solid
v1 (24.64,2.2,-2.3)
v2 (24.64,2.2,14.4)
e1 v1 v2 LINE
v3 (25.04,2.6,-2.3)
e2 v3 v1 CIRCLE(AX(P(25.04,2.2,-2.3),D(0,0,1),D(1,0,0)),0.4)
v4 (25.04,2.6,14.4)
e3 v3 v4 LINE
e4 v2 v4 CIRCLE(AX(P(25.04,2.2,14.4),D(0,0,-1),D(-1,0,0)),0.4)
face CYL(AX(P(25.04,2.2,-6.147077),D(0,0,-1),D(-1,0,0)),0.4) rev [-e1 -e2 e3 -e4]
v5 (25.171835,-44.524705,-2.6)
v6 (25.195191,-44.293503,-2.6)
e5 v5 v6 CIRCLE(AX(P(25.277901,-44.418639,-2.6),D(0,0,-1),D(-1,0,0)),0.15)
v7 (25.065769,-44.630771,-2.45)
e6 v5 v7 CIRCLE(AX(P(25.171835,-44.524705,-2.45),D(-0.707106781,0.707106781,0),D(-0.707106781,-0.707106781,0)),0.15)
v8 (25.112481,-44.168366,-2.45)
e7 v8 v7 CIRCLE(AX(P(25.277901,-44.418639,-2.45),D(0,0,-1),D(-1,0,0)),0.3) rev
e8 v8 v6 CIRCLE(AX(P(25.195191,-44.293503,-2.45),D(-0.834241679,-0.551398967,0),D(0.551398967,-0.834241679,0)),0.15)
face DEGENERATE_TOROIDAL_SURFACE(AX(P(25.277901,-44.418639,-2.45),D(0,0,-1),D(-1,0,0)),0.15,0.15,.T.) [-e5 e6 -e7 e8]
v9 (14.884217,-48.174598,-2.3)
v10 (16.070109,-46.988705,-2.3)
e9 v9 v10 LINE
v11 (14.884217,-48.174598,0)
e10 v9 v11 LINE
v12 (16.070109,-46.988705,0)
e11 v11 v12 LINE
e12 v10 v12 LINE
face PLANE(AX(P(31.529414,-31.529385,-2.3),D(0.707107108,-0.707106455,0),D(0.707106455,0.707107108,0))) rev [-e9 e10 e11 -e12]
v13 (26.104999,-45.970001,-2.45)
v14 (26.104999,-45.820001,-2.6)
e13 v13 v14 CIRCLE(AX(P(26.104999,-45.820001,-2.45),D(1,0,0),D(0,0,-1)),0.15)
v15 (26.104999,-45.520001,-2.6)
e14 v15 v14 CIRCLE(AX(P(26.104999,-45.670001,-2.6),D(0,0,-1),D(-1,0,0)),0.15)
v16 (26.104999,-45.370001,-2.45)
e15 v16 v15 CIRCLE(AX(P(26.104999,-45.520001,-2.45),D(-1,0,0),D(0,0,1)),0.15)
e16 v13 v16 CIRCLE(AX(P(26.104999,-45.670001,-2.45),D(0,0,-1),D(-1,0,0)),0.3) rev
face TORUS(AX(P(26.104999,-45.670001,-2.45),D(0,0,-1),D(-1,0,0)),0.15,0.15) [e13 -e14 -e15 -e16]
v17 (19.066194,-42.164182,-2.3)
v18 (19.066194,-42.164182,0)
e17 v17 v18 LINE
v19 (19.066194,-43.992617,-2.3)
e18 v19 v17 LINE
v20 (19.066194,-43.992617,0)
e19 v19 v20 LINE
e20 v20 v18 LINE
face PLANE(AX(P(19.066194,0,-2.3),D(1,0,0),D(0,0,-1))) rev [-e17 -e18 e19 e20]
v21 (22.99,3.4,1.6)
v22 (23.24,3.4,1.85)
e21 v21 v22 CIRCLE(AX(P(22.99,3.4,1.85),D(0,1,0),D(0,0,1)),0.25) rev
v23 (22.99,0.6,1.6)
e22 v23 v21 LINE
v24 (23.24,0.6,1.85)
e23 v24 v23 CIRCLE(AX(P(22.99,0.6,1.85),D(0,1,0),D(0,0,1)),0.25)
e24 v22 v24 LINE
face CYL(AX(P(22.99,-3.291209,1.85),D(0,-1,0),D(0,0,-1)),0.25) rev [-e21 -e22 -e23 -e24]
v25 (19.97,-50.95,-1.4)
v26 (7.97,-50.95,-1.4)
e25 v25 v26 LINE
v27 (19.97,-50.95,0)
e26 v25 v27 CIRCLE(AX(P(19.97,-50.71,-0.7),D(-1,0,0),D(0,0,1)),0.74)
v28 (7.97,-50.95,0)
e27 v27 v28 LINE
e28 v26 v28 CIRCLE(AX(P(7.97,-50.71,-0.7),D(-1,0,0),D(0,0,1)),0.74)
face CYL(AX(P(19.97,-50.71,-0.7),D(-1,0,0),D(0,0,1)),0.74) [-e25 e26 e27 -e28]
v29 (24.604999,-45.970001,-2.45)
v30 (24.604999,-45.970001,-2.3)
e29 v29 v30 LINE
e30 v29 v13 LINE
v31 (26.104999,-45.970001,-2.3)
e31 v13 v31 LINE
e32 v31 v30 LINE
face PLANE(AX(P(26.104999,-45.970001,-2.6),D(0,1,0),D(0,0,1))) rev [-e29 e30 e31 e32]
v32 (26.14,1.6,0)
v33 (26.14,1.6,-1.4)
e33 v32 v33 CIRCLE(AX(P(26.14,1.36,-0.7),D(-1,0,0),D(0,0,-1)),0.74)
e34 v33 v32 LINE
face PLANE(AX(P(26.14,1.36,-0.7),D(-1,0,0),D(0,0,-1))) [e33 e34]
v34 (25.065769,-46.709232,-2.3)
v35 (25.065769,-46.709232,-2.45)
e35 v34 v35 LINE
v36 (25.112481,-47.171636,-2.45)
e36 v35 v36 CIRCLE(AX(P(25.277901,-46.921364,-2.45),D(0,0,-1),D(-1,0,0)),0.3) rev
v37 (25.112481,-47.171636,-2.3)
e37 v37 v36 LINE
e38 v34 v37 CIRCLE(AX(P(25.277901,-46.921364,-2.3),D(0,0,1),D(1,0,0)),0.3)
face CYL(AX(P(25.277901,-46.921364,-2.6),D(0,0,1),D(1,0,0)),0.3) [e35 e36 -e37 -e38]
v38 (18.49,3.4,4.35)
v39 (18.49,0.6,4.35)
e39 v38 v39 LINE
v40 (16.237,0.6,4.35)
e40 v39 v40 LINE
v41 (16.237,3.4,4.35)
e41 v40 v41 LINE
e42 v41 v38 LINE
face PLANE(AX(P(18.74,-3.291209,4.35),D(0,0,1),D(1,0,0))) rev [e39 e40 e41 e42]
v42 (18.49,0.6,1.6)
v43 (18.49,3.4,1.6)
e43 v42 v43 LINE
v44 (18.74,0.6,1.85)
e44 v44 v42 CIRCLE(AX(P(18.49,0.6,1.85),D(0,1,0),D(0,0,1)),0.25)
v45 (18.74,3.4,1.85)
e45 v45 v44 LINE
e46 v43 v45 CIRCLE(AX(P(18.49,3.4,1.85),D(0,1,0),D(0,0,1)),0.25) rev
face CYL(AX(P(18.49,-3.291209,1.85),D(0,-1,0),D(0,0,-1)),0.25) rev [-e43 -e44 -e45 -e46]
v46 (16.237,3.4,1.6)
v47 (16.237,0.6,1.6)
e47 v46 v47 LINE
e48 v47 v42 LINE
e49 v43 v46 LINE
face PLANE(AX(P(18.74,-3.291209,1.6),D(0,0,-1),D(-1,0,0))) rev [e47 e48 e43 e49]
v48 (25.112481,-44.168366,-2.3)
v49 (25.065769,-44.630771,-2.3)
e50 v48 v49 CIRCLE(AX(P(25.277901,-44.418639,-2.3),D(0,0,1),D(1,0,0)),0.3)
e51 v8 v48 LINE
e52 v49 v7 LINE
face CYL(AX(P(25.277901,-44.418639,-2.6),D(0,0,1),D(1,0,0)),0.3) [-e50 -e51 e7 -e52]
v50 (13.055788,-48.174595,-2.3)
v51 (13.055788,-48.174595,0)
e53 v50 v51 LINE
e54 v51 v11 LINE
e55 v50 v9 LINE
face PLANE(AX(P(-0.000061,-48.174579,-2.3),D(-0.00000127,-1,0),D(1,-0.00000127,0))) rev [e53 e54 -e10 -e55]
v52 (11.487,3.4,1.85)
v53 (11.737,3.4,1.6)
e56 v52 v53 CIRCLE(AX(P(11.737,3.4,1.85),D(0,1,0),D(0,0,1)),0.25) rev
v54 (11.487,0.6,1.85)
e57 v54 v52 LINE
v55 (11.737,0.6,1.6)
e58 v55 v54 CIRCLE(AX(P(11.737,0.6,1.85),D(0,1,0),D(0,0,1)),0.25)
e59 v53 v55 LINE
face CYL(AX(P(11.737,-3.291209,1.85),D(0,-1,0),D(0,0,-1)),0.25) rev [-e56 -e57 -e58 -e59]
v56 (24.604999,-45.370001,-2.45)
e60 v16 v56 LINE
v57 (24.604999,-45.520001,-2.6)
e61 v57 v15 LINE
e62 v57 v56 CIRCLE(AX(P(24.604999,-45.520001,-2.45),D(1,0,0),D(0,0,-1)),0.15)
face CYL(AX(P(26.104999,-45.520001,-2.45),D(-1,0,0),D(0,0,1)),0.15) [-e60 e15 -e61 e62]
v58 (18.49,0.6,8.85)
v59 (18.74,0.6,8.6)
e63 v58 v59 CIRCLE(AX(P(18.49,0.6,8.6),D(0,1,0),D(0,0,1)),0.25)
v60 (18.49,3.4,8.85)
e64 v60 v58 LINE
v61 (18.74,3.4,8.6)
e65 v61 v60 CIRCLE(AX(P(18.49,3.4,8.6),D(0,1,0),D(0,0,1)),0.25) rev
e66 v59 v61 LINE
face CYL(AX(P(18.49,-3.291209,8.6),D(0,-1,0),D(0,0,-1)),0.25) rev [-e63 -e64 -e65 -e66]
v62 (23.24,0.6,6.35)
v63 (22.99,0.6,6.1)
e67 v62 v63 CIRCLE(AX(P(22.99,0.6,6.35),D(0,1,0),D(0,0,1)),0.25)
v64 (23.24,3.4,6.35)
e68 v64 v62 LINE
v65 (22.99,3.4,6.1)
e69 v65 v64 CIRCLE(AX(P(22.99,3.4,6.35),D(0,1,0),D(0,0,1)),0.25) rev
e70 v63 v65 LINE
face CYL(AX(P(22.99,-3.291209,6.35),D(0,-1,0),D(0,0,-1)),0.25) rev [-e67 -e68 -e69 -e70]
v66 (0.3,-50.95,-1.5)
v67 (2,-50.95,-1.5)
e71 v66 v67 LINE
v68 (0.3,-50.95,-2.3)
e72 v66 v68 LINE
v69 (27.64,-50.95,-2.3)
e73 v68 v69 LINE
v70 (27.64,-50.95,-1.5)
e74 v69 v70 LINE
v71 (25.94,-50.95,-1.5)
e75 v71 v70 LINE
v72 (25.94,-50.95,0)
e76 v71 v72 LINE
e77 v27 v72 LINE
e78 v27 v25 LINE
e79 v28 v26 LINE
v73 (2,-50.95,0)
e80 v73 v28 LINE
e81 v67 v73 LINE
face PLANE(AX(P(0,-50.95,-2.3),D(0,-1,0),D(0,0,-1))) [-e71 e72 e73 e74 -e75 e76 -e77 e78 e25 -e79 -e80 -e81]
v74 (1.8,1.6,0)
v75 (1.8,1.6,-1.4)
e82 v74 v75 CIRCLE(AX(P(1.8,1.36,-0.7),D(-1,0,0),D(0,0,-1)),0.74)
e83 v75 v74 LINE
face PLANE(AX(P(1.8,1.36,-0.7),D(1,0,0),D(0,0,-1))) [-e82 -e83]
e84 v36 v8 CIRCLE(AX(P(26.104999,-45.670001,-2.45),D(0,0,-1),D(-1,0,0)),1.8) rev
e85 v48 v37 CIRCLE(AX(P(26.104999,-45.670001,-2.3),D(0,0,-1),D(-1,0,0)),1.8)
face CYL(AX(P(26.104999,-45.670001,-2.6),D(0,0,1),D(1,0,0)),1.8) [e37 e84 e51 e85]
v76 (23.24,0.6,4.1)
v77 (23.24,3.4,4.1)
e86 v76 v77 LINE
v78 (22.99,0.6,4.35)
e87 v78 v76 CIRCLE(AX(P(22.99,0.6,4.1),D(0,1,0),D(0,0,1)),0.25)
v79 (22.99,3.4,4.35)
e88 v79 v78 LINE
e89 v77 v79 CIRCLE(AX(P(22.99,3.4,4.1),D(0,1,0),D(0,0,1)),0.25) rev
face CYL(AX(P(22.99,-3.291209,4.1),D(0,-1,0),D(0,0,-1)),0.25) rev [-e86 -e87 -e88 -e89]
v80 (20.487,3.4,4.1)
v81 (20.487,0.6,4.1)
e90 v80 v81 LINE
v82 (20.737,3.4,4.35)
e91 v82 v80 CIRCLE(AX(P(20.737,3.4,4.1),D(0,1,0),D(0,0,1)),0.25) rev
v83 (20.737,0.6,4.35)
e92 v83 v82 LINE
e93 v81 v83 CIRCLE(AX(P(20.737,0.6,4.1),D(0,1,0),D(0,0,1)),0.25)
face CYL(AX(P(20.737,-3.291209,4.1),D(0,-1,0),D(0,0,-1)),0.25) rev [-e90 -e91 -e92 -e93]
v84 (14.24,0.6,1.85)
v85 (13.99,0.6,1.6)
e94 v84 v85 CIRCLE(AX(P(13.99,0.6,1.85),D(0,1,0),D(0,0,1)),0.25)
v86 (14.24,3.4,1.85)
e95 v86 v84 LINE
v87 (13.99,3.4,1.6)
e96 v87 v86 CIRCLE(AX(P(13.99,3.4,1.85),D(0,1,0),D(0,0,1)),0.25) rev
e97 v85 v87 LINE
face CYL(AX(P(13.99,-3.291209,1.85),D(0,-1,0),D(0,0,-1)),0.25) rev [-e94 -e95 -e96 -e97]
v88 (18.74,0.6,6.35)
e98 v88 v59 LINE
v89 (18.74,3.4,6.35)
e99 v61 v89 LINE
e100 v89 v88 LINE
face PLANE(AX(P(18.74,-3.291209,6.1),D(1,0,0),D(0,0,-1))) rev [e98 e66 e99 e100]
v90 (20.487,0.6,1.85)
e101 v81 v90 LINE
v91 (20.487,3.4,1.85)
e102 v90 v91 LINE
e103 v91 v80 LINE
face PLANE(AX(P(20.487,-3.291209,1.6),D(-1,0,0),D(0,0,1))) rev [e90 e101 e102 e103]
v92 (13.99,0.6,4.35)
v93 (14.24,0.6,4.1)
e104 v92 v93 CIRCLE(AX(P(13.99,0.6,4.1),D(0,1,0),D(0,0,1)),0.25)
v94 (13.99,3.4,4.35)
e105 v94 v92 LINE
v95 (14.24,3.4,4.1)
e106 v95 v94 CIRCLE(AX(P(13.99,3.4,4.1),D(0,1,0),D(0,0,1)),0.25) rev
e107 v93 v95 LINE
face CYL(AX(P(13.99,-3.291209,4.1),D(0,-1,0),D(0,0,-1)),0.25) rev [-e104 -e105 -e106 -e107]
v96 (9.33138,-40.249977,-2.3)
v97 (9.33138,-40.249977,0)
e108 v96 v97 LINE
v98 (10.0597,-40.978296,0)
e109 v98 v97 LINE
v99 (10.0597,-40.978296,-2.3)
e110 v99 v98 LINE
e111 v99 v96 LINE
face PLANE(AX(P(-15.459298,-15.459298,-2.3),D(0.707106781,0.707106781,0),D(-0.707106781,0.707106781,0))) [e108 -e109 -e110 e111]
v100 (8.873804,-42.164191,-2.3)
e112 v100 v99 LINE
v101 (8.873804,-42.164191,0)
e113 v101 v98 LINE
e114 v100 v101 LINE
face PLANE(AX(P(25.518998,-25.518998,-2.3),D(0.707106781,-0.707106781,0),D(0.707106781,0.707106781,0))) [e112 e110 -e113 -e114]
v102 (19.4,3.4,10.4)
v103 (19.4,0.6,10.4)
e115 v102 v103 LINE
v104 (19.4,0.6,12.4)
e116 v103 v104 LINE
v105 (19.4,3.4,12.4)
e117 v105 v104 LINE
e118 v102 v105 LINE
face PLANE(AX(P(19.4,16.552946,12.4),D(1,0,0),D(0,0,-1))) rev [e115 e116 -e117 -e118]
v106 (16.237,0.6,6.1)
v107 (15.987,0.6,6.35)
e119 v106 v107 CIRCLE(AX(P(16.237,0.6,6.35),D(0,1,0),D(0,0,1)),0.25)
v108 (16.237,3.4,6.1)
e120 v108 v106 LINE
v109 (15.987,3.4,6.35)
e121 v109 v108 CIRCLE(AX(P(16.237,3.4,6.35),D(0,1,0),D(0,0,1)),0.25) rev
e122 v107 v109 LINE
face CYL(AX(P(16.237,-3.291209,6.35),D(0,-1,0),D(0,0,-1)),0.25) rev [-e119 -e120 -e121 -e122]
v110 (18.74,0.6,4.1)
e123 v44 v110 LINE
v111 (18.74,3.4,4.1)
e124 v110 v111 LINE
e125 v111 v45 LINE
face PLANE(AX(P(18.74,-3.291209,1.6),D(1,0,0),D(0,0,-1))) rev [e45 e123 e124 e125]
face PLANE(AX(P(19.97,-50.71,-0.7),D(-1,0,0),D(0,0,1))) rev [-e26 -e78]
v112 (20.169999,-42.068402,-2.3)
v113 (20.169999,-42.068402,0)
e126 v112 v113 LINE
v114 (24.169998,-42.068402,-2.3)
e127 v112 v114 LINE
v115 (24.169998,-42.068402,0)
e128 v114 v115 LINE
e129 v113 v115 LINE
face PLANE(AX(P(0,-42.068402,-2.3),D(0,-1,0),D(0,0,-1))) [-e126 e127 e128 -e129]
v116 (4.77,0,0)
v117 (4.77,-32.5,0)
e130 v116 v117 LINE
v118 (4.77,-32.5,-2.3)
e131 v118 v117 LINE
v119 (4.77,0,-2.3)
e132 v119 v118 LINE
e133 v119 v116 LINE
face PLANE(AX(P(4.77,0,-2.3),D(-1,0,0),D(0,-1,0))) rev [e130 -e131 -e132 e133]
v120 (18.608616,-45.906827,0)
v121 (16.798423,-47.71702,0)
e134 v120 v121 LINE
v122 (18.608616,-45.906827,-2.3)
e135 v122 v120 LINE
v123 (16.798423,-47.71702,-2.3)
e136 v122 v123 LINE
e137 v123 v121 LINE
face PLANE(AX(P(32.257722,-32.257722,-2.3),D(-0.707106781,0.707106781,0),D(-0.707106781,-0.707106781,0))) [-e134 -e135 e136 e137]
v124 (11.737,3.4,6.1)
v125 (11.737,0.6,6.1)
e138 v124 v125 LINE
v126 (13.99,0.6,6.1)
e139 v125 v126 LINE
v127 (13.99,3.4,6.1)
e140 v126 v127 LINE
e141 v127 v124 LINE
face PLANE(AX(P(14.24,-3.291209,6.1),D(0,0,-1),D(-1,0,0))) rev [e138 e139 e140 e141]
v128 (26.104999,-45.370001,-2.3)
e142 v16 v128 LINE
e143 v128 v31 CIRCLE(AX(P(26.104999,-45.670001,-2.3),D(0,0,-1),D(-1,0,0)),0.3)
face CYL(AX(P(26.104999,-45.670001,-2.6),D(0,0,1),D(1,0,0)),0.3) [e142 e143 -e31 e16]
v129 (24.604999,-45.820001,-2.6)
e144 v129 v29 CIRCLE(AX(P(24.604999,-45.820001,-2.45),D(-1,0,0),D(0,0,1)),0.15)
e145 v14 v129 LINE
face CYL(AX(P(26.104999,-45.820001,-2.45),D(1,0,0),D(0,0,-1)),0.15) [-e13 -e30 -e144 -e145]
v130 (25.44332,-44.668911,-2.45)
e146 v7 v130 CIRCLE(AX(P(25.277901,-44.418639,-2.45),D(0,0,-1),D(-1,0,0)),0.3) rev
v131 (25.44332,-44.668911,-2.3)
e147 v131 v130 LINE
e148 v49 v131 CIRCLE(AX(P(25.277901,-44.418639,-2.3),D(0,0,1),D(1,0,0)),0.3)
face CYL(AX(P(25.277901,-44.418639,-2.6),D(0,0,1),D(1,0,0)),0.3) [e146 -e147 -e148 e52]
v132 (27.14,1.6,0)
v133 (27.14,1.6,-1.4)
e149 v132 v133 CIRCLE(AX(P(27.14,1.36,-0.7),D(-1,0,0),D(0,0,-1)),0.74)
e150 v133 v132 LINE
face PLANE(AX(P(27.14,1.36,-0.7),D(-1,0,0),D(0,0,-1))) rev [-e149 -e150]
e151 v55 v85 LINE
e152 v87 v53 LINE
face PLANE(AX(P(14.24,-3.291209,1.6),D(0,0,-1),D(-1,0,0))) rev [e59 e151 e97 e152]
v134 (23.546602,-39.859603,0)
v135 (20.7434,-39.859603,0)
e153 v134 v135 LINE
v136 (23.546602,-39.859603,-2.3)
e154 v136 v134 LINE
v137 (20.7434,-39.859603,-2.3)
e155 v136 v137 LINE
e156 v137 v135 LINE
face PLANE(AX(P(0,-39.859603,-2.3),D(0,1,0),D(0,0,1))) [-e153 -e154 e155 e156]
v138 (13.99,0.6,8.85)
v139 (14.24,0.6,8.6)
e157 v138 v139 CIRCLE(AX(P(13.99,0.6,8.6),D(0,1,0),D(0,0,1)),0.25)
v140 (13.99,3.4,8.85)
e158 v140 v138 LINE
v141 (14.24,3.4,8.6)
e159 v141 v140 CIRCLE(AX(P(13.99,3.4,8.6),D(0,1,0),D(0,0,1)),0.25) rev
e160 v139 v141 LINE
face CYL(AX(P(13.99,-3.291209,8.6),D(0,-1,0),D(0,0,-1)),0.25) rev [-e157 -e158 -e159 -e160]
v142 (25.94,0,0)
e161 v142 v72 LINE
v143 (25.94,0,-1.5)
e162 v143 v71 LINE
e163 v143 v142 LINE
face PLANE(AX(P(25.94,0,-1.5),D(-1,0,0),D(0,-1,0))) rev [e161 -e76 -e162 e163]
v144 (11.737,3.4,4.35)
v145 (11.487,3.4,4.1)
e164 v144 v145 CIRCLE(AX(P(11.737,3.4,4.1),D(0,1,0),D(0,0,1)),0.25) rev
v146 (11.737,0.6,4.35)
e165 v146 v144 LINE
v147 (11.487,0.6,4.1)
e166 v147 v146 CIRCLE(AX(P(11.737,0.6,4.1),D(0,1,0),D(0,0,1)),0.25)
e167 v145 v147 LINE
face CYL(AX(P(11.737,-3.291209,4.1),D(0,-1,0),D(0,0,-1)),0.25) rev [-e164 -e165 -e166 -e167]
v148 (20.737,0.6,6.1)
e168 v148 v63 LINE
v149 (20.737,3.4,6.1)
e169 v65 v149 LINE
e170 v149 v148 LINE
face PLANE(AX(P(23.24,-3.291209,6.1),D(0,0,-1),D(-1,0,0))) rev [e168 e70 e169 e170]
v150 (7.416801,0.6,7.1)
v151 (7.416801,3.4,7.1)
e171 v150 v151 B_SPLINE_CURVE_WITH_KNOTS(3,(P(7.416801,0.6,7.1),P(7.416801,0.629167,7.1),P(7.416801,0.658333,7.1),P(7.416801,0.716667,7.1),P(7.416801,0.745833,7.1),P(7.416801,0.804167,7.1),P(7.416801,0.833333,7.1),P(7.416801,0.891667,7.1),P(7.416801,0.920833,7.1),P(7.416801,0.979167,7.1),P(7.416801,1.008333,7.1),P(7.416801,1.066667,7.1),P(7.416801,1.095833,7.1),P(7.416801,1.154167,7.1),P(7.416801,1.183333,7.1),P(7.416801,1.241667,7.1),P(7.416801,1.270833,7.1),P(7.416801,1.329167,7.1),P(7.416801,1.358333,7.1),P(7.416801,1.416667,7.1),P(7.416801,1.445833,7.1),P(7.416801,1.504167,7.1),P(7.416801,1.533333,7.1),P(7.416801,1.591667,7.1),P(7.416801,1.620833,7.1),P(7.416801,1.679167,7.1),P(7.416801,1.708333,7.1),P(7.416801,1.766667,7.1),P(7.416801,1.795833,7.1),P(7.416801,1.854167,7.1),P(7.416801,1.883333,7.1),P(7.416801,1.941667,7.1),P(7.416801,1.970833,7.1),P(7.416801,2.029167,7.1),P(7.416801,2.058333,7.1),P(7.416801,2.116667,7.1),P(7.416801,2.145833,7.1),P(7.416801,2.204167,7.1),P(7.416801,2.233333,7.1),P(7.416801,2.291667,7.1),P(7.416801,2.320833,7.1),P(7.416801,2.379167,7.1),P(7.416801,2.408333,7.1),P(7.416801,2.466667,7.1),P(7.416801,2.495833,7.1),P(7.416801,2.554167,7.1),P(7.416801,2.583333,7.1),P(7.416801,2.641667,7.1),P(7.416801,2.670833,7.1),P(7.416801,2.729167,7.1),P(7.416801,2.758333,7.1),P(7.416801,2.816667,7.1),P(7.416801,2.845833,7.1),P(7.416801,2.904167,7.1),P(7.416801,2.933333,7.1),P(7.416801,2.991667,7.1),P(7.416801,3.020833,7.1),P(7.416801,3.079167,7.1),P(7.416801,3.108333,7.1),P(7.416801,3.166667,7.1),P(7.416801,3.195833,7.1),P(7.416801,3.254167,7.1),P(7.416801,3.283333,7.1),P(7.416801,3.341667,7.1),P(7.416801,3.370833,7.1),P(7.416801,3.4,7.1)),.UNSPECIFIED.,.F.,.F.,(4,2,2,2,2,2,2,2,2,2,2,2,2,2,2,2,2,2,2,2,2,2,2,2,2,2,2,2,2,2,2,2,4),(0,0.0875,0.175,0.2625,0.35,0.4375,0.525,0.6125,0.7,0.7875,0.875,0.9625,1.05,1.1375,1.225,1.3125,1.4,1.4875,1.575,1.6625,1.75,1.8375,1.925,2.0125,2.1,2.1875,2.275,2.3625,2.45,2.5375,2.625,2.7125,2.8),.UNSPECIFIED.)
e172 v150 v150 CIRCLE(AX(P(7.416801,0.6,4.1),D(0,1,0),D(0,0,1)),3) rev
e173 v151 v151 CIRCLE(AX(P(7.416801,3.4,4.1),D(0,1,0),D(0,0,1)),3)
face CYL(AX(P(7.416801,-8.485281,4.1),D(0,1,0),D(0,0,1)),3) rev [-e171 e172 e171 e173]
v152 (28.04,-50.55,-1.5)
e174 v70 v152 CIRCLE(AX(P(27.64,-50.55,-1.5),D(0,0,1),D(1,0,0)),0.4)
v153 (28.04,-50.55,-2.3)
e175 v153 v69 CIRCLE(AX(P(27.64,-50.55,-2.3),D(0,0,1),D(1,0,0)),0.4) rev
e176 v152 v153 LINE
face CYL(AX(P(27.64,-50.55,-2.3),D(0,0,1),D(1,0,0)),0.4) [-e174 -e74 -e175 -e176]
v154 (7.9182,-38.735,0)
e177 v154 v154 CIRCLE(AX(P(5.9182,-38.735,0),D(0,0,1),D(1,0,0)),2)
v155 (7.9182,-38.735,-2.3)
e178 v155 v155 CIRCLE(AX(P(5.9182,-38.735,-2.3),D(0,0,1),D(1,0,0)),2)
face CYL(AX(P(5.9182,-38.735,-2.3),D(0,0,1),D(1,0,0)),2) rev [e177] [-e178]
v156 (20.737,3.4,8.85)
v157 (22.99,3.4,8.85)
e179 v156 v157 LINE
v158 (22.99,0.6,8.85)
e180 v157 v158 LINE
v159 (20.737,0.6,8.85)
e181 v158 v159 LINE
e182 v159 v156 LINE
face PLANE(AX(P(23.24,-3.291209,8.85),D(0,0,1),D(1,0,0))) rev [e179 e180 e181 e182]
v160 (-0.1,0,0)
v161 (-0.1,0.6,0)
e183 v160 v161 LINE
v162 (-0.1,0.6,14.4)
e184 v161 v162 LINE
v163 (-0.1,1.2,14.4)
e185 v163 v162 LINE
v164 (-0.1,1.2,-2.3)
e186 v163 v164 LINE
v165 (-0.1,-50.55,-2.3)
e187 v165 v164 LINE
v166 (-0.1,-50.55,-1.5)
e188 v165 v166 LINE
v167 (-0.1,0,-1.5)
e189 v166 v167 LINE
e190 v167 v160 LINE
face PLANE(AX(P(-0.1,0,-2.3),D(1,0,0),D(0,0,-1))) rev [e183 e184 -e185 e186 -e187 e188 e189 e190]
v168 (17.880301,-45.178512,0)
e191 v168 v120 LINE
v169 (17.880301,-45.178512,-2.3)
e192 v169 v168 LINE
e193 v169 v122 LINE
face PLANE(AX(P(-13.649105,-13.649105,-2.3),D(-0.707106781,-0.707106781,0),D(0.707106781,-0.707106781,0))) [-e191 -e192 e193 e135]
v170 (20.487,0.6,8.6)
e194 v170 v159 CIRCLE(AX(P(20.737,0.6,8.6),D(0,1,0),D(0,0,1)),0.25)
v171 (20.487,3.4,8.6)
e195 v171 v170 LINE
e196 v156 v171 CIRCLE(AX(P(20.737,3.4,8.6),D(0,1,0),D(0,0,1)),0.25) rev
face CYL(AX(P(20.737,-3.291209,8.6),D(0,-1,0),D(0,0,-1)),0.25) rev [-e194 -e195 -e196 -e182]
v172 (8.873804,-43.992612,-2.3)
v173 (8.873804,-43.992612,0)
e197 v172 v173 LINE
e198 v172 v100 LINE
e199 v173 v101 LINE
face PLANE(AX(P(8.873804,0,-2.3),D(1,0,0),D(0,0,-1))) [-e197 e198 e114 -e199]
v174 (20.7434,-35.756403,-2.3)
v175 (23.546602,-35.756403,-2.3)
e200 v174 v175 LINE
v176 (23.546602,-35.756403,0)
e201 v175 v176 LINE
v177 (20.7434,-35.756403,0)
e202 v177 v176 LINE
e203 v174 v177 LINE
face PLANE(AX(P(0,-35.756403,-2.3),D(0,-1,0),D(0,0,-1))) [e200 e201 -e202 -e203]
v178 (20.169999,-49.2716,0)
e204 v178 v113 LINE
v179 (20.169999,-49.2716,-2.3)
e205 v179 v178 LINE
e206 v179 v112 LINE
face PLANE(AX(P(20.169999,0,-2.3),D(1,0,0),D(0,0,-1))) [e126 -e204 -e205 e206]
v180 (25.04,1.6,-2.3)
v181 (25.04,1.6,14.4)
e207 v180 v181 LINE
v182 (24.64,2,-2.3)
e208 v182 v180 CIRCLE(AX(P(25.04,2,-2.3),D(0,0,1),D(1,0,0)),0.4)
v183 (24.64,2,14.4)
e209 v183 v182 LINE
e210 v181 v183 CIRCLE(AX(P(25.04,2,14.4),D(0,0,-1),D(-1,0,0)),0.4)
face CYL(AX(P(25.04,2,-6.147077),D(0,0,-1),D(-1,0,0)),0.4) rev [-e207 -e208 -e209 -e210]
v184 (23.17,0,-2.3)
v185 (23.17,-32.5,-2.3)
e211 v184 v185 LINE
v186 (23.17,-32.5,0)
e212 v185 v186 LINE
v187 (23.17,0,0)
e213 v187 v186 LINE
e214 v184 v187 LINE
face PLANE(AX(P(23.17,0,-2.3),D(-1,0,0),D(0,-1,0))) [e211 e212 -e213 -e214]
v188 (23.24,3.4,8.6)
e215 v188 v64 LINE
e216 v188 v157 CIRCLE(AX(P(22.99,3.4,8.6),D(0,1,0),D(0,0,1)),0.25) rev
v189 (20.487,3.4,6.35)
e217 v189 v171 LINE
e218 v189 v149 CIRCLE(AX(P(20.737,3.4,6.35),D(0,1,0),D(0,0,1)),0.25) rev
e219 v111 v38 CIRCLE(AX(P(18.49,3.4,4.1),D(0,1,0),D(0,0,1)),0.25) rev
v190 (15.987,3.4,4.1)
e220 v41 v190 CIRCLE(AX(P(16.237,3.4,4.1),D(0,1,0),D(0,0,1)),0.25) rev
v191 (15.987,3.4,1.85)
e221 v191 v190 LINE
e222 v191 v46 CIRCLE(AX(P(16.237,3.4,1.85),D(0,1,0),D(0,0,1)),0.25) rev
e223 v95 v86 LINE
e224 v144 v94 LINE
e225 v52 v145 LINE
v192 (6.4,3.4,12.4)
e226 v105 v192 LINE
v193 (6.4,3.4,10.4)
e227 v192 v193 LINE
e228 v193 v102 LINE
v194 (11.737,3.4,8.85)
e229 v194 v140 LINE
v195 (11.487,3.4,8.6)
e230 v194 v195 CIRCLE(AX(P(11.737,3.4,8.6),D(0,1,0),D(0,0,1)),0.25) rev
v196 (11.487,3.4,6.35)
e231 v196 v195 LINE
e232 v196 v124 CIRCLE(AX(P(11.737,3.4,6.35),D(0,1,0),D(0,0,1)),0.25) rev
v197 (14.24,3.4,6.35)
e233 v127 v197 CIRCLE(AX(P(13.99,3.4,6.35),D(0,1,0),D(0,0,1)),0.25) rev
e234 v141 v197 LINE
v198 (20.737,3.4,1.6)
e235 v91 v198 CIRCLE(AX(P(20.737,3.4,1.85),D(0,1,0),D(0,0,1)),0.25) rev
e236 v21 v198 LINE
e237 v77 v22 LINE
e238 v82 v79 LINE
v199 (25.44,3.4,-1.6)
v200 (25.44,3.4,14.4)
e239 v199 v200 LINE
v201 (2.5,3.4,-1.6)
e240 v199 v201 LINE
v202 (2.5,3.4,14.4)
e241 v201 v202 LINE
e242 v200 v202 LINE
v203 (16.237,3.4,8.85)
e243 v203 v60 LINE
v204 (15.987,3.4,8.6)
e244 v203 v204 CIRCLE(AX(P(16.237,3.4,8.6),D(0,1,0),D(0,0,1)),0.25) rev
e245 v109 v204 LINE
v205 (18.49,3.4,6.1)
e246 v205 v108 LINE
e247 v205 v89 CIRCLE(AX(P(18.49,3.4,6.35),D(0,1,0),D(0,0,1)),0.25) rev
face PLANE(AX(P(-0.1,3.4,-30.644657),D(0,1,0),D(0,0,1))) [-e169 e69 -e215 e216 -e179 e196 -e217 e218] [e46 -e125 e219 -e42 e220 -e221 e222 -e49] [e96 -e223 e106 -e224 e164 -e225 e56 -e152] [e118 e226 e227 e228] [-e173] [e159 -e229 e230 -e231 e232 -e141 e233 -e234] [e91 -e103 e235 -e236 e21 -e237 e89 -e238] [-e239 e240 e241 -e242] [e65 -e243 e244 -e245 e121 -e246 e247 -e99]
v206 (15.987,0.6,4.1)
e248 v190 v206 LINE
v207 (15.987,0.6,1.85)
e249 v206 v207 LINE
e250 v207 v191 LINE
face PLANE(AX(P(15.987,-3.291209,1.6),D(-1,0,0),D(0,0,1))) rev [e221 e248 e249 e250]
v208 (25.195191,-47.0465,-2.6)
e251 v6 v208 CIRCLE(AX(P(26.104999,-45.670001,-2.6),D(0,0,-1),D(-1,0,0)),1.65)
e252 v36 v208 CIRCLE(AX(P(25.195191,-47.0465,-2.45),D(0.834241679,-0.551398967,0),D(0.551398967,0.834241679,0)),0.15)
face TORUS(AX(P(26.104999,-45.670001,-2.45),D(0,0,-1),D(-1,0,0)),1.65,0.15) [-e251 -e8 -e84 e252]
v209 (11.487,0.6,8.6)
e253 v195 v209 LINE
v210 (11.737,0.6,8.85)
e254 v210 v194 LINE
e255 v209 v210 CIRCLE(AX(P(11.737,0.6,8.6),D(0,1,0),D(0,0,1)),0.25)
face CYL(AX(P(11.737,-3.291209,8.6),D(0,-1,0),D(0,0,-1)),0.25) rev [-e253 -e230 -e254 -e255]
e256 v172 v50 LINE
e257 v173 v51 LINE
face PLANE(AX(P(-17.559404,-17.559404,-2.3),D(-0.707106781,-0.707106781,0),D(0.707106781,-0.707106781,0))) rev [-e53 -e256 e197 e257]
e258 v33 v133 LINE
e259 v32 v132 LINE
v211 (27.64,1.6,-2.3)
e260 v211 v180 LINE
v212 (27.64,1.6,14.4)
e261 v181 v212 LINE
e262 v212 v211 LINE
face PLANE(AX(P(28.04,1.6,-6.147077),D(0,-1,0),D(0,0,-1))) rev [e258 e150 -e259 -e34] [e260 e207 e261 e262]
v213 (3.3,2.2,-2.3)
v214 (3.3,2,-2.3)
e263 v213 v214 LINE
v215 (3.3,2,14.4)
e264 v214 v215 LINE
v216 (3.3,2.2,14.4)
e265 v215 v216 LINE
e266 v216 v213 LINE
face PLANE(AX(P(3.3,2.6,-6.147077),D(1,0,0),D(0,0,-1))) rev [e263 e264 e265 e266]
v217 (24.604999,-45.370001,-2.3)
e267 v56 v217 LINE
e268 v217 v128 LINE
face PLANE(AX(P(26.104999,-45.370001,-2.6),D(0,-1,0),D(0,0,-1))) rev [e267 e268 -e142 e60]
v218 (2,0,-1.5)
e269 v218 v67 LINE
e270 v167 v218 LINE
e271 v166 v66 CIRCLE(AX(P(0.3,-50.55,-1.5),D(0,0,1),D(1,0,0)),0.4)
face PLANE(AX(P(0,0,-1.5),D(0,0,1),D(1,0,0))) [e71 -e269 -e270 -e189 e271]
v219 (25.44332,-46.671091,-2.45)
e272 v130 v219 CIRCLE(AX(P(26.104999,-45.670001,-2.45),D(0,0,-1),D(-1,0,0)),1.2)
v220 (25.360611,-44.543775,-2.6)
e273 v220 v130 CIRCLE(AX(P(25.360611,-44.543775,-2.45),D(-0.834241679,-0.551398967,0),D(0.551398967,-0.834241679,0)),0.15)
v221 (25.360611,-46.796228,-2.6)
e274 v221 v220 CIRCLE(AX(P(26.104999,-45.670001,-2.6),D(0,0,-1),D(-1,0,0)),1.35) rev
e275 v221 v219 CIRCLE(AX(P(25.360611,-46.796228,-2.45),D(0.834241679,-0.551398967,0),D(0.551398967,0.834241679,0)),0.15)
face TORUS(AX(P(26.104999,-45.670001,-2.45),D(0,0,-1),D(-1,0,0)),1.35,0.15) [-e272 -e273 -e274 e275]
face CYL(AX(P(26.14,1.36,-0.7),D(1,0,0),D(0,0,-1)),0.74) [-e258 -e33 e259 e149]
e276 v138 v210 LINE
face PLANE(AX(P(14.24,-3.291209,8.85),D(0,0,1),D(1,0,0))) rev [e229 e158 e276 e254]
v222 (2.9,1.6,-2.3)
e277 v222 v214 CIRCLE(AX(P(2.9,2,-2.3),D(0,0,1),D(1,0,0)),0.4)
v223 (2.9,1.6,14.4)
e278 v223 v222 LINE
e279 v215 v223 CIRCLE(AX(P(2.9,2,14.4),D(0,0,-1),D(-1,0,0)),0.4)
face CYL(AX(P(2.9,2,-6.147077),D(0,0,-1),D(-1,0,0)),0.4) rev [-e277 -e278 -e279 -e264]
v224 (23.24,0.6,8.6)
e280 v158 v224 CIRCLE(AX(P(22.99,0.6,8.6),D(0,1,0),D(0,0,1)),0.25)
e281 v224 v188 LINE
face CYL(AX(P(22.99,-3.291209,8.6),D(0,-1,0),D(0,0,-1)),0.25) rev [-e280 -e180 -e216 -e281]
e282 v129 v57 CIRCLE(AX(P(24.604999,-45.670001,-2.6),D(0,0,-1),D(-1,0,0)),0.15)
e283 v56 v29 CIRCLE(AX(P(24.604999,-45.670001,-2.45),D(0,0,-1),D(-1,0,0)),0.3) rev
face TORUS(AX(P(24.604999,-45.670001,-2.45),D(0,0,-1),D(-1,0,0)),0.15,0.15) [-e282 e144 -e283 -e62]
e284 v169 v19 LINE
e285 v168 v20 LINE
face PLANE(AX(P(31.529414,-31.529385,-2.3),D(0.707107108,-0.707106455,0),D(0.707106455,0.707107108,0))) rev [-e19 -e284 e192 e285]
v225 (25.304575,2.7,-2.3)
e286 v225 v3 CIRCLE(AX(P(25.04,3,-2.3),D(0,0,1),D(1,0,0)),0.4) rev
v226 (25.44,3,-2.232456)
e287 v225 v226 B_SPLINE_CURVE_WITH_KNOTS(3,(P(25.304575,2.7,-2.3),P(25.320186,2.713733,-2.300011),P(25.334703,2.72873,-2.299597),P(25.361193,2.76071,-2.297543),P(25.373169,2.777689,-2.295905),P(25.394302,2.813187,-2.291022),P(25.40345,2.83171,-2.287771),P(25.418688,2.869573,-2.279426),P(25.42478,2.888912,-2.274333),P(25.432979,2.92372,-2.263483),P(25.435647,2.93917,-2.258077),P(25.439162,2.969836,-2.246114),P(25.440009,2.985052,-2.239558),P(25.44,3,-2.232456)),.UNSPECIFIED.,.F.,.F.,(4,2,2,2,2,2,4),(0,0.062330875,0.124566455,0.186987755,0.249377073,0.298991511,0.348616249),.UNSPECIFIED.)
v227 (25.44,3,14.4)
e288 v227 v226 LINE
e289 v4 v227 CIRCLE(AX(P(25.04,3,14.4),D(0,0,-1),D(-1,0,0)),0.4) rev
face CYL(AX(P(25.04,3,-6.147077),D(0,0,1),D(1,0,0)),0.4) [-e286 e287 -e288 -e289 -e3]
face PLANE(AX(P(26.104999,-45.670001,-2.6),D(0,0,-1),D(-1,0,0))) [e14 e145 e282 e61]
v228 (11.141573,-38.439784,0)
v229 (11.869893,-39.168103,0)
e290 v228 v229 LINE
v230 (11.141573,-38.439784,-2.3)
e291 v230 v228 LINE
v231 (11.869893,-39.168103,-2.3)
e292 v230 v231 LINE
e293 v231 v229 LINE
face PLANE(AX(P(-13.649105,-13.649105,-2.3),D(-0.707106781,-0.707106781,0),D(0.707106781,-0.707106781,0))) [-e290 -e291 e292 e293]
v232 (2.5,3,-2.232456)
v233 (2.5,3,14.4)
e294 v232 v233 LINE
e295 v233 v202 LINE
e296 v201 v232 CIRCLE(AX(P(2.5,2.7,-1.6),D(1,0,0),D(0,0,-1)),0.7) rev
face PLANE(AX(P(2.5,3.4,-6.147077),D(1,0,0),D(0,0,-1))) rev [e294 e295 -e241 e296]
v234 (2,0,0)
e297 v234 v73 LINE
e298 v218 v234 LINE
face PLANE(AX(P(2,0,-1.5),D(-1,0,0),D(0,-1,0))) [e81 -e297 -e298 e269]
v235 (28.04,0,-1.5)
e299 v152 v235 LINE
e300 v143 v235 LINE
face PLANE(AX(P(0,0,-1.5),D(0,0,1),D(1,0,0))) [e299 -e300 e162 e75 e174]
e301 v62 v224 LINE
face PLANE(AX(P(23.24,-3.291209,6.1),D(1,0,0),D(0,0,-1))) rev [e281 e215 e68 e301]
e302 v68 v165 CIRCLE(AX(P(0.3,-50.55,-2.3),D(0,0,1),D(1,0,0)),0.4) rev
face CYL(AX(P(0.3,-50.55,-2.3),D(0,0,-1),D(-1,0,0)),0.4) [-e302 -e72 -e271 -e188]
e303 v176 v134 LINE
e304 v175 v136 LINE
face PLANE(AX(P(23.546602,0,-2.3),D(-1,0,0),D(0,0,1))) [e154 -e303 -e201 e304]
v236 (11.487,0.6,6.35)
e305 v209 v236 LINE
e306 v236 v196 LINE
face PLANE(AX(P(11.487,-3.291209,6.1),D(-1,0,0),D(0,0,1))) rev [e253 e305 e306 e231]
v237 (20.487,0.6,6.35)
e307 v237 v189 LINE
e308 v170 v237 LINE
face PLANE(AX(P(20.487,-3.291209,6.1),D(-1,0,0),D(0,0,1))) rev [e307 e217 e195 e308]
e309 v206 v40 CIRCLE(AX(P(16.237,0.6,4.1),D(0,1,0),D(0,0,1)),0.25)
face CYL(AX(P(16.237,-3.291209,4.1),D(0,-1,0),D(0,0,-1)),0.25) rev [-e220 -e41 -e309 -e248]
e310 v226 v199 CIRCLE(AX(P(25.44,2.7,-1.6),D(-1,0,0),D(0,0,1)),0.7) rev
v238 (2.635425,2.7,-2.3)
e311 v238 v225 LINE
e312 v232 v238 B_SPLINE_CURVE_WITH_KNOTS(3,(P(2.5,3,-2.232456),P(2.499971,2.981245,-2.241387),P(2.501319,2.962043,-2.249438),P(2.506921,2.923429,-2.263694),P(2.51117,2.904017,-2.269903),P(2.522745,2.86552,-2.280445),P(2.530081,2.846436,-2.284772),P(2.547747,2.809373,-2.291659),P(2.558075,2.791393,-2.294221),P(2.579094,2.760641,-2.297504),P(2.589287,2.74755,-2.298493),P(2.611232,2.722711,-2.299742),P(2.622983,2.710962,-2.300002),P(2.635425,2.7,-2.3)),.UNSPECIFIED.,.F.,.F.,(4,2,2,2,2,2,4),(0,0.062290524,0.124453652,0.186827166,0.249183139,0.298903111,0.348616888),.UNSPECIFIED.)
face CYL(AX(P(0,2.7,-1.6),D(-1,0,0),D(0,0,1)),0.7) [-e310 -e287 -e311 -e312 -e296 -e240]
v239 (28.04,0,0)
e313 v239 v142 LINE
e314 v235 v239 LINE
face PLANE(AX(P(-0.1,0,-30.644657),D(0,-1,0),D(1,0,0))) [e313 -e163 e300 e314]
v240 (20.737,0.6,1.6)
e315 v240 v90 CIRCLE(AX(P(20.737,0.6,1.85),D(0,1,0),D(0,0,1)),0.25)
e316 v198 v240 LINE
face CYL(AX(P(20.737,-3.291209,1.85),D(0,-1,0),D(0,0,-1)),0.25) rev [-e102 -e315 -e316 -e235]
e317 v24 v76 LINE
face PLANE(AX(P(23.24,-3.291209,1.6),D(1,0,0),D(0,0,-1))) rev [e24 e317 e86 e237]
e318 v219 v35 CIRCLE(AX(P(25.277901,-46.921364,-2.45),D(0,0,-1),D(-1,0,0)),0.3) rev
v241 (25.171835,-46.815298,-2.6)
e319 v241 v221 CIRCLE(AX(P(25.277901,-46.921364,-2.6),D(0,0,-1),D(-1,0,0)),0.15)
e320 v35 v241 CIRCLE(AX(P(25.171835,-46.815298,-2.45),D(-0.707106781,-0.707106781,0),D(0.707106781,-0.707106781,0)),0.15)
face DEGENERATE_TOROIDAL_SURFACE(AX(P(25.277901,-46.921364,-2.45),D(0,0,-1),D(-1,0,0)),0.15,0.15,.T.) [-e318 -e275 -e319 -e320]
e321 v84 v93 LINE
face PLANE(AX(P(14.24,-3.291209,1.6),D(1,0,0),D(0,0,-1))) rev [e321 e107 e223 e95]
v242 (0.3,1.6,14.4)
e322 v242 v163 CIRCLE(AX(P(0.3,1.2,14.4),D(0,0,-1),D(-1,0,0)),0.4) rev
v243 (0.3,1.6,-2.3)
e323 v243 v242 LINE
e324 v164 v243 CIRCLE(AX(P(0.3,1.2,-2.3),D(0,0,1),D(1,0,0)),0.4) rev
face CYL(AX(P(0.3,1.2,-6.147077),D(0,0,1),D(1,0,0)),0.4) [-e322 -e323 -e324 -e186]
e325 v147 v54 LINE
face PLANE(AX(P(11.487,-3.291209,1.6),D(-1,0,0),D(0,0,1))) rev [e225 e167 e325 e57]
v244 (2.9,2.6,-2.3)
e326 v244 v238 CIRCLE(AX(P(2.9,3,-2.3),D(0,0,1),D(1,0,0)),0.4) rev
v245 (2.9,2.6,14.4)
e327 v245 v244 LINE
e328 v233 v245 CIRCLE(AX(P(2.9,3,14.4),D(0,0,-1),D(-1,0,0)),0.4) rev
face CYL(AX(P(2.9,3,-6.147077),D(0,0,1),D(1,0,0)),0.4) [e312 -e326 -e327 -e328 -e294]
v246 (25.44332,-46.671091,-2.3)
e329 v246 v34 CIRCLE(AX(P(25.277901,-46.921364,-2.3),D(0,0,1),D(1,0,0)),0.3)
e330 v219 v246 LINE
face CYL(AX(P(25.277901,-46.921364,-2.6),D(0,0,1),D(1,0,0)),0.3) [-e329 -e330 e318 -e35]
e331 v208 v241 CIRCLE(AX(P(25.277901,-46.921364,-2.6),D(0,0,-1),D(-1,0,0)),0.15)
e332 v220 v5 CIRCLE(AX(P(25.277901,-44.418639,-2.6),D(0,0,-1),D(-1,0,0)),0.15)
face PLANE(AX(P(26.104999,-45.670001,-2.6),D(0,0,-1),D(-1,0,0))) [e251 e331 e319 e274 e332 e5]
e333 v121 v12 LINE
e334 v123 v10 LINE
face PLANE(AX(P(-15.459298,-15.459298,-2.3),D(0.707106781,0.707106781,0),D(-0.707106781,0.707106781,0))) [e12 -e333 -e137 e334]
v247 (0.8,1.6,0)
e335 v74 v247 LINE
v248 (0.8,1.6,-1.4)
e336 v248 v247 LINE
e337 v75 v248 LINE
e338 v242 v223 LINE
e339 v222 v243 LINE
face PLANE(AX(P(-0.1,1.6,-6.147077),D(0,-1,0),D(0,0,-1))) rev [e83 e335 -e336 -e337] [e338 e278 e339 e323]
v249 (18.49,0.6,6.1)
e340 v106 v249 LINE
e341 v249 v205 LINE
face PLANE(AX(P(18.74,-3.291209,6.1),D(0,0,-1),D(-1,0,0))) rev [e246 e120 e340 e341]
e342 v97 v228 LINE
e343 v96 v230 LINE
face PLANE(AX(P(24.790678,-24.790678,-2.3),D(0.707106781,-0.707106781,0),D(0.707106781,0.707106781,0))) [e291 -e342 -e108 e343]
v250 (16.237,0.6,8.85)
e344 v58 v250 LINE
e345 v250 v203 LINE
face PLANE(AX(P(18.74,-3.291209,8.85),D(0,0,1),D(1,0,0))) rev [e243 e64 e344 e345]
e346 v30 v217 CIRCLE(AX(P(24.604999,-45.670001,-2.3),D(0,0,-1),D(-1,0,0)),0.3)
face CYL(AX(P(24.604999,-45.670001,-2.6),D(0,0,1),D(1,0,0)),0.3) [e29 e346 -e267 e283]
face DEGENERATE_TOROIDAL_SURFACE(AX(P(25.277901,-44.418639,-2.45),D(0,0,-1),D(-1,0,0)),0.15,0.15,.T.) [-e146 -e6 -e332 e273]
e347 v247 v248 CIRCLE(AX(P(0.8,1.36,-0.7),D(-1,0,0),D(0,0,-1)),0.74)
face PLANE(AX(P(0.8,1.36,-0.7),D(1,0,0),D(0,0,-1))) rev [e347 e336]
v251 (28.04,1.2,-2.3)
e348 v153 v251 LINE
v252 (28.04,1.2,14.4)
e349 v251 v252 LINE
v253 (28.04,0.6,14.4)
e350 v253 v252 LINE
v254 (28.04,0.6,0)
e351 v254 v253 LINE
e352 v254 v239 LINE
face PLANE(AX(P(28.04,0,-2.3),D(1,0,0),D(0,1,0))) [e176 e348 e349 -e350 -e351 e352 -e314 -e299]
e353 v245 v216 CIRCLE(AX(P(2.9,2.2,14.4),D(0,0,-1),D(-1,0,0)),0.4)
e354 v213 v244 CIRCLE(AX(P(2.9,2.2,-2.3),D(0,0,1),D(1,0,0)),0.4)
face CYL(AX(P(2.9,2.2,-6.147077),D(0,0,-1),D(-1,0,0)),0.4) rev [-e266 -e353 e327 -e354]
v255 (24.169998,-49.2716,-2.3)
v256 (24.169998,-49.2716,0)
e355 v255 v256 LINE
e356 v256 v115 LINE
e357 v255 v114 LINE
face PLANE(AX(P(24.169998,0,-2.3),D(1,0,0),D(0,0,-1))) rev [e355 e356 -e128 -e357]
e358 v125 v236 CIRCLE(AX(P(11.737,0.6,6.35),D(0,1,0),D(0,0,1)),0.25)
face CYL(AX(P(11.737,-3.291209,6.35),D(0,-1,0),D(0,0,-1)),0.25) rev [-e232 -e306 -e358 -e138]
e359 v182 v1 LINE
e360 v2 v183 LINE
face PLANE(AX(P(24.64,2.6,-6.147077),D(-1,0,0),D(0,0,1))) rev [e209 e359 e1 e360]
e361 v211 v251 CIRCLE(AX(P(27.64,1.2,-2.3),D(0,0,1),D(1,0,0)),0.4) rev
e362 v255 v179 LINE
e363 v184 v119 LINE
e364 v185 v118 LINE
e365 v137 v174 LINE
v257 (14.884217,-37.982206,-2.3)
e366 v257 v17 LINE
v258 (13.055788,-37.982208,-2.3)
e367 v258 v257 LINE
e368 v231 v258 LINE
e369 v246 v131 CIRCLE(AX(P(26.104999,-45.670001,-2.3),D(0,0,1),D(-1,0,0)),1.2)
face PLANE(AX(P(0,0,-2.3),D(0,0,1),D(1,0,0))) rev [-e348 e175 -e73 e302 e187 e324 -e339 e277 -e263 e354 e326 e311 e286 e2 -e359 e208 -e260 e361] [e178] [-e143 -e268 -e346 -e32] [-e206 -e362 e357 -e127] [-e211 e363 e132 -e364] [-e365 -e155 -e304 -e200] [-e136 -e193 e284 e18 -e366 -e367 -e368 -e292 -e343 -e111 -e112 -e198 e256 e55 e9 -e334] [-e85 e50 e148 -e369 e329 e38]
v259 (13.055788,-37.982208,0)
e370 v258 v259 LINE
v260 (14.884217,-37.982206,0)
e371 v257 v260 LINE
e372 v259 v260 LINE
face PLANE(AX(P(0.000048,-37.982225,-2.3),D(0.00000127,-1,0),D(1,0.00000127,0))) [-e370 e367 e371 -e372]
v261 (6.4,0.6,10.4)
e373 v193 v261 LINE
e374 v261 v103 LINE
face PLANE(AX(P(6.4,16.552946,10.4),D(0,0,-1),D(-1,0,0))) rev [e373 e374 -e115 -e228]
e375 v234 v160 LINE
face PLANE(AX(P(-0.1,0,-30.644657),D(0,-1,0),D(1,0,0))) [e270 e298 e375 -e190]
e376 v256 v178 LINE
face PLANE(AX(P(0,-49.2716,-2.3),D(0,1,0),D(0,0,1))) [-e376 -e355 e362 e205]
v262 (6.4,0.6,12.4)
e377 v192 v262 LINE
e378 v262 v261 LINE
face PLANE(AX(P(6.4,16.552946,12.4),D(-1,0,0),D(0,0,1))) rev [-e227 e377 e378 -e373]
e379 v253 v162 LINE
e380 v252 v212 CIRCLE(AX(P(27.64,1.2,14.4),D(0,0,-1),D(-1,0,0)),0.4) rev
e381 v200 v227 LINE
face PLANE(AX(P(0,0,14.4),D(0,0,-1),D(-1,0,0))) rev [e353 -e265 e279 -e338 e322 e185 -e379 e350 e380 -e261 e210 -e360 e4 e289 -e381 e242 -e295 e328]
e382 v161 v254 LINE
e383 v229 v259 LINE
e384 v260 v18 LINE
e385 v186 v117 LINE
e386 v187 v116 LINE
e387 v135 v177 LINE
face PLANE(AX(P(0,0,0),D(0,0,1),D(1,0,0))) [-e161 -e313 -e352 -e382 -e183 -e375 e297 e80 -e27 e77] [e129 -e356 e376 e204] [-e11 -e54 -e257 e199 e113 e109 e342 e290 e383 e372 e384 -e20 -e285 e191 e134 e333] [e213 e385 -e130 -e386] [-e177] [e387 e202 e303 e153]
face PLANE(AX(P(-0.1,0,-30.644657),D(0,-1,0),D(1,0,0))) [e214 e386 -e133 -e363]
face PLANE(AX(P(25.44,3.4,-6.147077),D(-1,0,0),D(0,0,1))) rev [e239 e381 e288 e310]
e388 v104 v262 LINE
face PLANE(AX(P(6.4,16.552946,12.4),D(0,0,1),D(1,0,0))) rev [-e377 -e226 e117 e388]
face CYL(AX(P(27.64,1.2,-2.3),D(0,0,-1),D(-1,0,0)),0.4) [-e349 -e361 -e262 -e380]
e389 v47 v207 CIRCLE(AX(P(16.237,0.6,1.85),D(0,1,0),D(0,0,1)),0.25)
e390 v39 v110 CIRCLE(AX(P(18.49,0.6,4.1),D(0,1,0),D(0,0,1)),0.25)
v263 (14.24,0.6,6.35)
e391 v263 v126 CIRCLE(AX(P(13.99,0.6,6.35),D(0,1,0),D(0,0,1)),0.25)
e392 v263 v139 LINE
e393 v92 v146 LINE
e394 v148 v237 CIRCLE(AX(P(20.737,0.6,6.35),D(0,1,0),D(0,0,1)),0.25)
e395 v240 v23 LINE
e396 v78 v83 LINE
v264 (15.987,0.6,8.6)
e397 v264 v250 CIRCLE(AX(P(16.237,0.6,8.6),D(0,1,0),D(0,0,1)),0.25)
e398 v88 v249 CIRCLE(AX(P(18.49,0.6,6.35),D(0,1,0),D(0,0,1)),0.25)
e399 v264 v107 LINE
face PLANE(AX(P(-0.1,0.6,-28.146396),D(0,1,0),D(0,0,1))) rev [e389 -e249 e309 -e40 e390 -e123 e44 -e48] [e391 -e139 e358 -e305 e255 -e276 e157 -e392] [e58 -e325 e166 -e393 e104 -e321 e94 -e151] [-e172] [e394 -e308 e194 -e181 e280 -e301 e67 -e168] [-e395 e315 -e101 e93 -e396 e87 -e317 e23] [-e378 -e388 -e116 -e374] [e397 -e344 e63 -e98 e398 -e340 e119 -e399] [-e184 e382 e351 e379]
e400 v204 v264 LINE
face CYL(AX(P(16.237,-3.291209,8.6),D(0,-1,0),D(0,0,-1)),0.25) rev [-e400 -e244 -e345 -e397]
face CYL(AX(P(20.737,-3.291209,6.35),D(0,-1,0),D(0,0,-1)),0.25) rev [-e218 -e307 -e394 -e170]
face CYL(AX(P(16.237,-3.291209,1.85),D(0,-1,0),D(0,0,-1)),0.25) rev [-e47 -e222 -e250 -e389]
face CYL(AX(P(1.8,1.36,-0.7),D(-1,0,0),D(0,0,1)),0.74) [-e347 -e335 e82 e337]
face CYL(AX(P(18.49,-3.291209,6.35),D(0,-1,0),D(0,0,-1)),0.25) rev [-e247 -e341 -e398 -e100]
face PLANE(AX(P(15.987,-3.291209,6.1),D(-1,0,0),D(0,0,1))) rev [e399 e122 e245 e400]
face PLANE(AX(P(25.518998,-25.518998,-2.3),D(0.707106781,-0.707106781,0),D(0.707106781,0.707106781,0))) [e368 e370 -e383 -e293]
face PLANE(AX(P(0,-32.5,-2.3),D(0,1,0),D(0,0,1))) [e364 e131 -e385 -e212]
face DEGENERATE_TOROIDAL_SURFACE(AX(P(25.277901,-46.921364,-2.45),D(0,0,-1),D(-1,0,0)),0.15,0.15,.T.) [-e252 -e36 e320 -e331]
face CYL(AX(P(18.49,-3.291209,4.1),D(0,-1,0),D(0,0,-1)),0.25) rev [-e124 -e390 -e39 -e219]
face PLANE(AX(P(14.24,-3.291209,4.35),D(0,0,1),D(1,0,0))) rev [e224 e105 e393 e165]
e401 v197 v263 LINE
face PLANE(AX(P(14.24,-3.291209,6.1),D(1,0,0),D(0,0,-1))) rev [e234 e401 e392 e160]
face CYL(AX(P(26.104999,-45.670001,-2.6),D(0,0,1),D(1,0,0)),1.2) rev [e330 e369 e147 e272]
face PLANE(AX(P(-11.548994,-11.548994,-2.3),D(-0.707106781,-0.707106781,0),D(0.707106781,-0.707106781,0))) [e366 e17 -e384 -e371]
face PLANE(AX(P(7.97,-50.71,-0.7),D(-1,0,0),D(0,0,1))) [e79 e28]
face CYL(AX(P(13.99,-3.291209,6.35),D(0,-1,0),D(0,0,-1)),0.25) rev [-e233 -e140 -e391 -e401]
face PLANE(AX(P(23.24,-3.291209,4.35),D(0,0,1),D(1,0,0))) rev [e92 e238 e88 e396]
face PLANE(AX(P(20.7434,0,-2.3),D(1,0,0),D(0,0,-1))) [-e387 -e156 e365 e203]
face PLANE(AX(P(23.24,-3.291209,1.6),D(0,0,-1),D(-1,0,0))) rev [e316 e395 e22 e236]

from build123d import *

# Parameters (mm, degrees)
SKETCH_2_W                     = 2.80320188
SKETCH_2_H                     = 4.10319928
SKETCH_2_R                     = 2
SKETCH_2_W_2                   = 3.99999908
SKETCH_2_H_2                   = 7.20319816
EXTRUDE_1_DEPTH                = 2.3
EXTRUDE_2_DEPTH                = 14.4
EXTRUDE_2_DEPTH_BACK           = 2.3
SKETCH_3_W                     = 28.14
SKETCH_3_H                     = 3.4
SKETCH_4_R                     = 3
CUT_EXTRUDE_1_DEPTH            = 3.4
SKETCH_2_3_W                   = 2.1
SKETCH_2_3_H                   = 50.95
CUT_EXTRUDE_2_DEPTH            = 1.5
CUT_EXTRUDE_3_REACH            = 62.506
SKETCH_7_W                     = 28.14
SKETCH_7_H                     = 0.6
SKETCH_8_W                     = 13
SKETCH_8_H                     = 2
CUT_EXTRUDE_4_DEPTH            = 2.8
CUT_EXTRUDE_5_DEPTH            = 16.7
EXTRUDE_3_DEPTH                = 1
EXTRUDE_4_DEPTH                = 6
EXTRUDE_4_DEPTH_BACK           = 6
FILLET_1_R                     = 0.4
FILLET_2_R                     = 0.7
FILLET_3_R                     = 0.4
SKETCH_12_W                    = 2.753
SKETCH_12_H                    = 2.75
CUT_EXTRUDE_6_DEPTH            = 2.8
FILLET_4_R                     = 0.25
PATTERN_LINEAR_1_COUNT         = 3
PATTERN_LINEAR_1_PITCH         = 4.5
PATTERN_LINEAR_1_COUNT_DIR2    = 2
PATTERN_LINEAR_1_PITCH_DIR2    = 4.5
FILLET_4_OF_PATTERN_LINEAR_1_R = 0.25
EXTRUDE_5_DEPTH                = 0.3
FILLET_6_R                     = 0.3
FILLET_5_R                     = 0.15


with BuildPart() as part:
    # 草图2 → 凸台-拉伸1 (new body)
    with BuildSketch(Plane.XY):
        Polygon((-0.1, 0), (-0.1, -50.95), (28.04, -50.95), (28.04, 0), (23.17, 0), (23.17, -32.5), (4.77, -32.5), (4.77, 0), align=None)
        with Locations((22.14500143, -37.80800287)):
            Rectangle(SKETCH_2_W, SKETCH_2_H, mode=Mode.SUBTRACT)
        with Locations((5.9182, -38.735)):
            Circle(SKETCH_2_R, mode=Mode.SUBTRACT)
        Polygon((19.066193866, -43.992617401), (17.88030086, -45.178511502), (18.608616214, -45.906826856), (16.798423264, -47.717019806), (16.070108746, -46.988705288), (14.884217409, -48.174597721), (13.055787589, -48.174595399), (8.873804338, -43.992612148), (8.873804338, -42.164191444), (10.05969962, -40.978296162), (9.331380194, -40.249976736), (11.141573144, -38.439783786), (11.86989257, -39.168103212), (13.055787589, -37.982208193), (14.884217273, -37.982205871), (19.066193866, -42.164182464), align=None, mode=Mode.SUBTRACT)
        with Locations((22.16999884, -45.67000137)):
            Rectangle(SKETCH_2_W_2, SKETCH_2_H_2, mode=Mode.SUBTRACT)
    extrude(amount=-EXTRUDE_1_DEPTH)

    # 草图3 → 凸台-拉伸2 (add, two sides: drawn at the far end of the back side and taken through both)
    with BuildSketch(Plane.XY.offset(-EXTRUDE_2_DEPTH_BACK)):
        with Locations((13.97, 1.7)):
            Rectangle(SKETCH_3_W, SKETCH_3_H)
    extrude(amount=EXTRUDE_2_DEPTH + EXTRUDE_2_DEPTH_BACK)

    # 草图4 → 切除-拉伸1 (cut)
    with BuildSketch(Plane(origin=(0, 3.4, 0), x_dir=(1, 0, 0), z_dir=(0, 1, 0))):
        with Locations(Location((7.41680127, -4.1, 0), (0, 0, 270))):
            Circle(SKETCH_4_R)
    extrude(amount=-CUT_EXTRUDE_1_DEPTH, mode=Mode.SUBTRACT)

    # 草图2<3> → 切除-拉伸2 (cut)
    with BuildSketch(Plane.XY):
        with Locations((0.95, -25.475)):
            Rectangle(SKETCH_2_3_W, SKETCH_2_3_H)
        with Locations((26.99, -25.475)):
            Rectangle(SKETCH_2_3_W, SKETCH_2_3_H)
    extrude(amount=-CUT_EXTRUDE_2_DEPTH, mode=Mode.SUBTRACT)

    # 切除-拉伸3: up to this face of the body (flat: up to its plane)
    cut_extrude_3_end = Plane(part.part.faces().sort_by_distance((13.97, -33.062941036, 0))[0])
    # 草图7 → 切除-拉伸3 (cut, up to the picked face)
    with BuildSketch(Plane.XY.offset(14.4), mode=Mode.PRIVATE) as cut_extrude_3_sk1:
        with Locations((13.97, 0.3)):
            Rectangle(SKETCH_7_W, SKETCH_7_H)
    cut_extrude_3_tool1 = split(extrude(cut_extrude_3_sk1.sketch, amount=-CUT_EXTRUDE_3_REACH, mode=Mode.PRIVATE), bisect_by=cut_extrude_3_end, keep=Keep.BOTH, mode=Mode.PRIVATE)
    add(cut_extrude_3_tool1.solids().sort_by(Axis((13.97, 0.3, 14.4), (0, 0, -1)))[0], mode=Mode.SUBTRACT)

    # 草图8 → 切除-拉伸4 (cut)
    with BuildSketch(Plane.XZ.offset(-0.6)):
        with Locations((12.9, 11.4)):
            Rectangle(SKETCH_8_W, SKETCH_8_H)
    extrude(amount=-CUT_EXTRUDE_4_DEPTH, mode=Mode.SUBTRACT)

    # 草图9 → 切除-拉伸5 (cut)
    with BuildSketch(Plane.XY.offset(14.4)):
        Polygon((2.5, 2.6), (3.3, 2.6), (3.3, 1.6), (-0.1, 1.6), (-0.1, 3.4), (2.5, 3.4), align=None)
        Polygon((28.04, 3.4), (25.44, 3.4), (25.44, 2.6), (24.64, 2.6), (24.64, 1.6), (28.04, 1.6), align=None)
    extrude(amount=-CUT_EXTRUDE_5_DEPTH, mode=Mode.SUBTRACT)

    # 草图10 → 凸台-拉伸3 (add)
    with BuildSketch(Plane.ZY.offset(-0.8)):
        with BuildLine():
            Line((-1.4, 1.6), (0, 1.6))
            ThreePointArc((0, 1.6), (-0.7, 2.1), (-1.4, 1.6))
        make_face()
    extrude_3 = extrude(amount=-EXTRUDE_3_DEPTH)

    # 镜向1: 凸台-拉伸3 across plane
    add(extrude_3.mirror(Plane.ZY.offset(-13.97)))

    # 草图11 → 凸台-拉伸4 (add, two sides: drawn at the far end of the back side and taken through both)
    with BuildSketch(Plane.ZY.offset(-13.97).offset(-EXTRUDE_4_DEPTH_BACK)):
        with BuildLine():
            Line((-1.4, -50.95), (0, -50.95))
            ThreePointArc((0, -50.95), (-0.7, -51.45), (-1.4, -50.95))
        make_face()
    extrude(amount=EXTRUDE_4_DEPTH + EXTRUDE_4_DEPTH_BACK)

    # 圆角1
    fillet_1_edges = [part.edges().sort_by_distance(p)[0] for p in [
        (3.3, 1.6, 6.05),
        (3.3, 2.6, 6.05),
        (2.5, 2.6, 6.05),
        (24.64, 1.6, 6.05),
        (24.64, 2.6, 6.05),
        (25.44, 2.6, 6.05),
    ]]
    fillet(fillet_1_edges, radius=FILLET_1_R - 0.0001)  # a hair under: the kernel refuses the full size

    # 圆角2
    fillet_2_edges = [part.edges().sort_by_distance(p)[0] for p in [
        (13.97, 3.4, -2.3),
    ]]
    fillet(fillet_2_edges, radius=FILLET_2_R)

    # 圆角3
    fillet_3_edges = [part.edges().sort_by_distance(p)[0] for p in [
        (28.04, 1.6, 6.05),
        (-0.1, 1.6, 6.05),
        (-0.1, -50.95, -1.9),
        (28.04, -50.95, -1.9),
    ]]
    fillet(fillet_3_edges, radius=FILLET_3_R)

    # 草图12 → 切除-拉伸6 (cut)
    with BuildSketch(Plane(origin=(0, 3.4, 0), x_dir=(1, 0, 0), z_dir=(0, 1, 0))):
        with Locations((21.8635, -2.975)):
            Rectangle(SKETCH_12_W, SKETCH_12_H)
    cut_extrude_6 = extrude(amount=-CUT_EXTRUDE_6_DEPTH, mode=Mode.SUBTRACT)

    # 圆角4
    fillet_4_edges = [part.edges().sort_by_distance(p)[0] for p in [
        (23.24, 2, 1.6),
        (23.24, 2, 4.35),
        (20.487, 2, 4.35),
        (20.487, 2, 1.6),
    ]]
    fillet(fillet_4_edges, radius=FILLET_4_R)

    # 阵列(线性)1: Cut-Extrude 6 3 × 2
    with Locations(*[(-i * PATTERN_LINEAR_1_PITCH, 0, j * PATTERN_LINEAR_1_PITCH_DIR2) for i in range(PATTERN_LINEAR_1_COUNT) for j in range(PATTERN_LINEAR_1_COUNT_DIR2) if (i, j) != (0, 0)]):
        add(cut_extrude_6, mode=Mode.SUBTRACT)

    # 圆角4 of 阵列(线性)1
    fillet_4_of_pattern_linear_1_edges = [part.edges().sort_by_distance(p)[0] for p in [
        (23.24, 2, 6.1),
        (23.24, 2, 8.85),
        (20.487, 2, 8.85),
        (20.487, 2, 6.1),
        (18.74, 2, 1.6),
        (18.74, 2, 4.35),
        (15.987, 2, 4.35),
        (15.987, 2, 1.6),
        (18.74, 2, 6.1),
        (18.74, 2, 8.85),
        (15.987, 2, 8.85),
        (15.987, 2, 6.1),
        (14.24, 2, 1.6),
        (14.24, 2, 4.35),
        (11.487, 2, 4.35),
        (11.487, 2, 1.6),
        (14.24, 2, 6.1),
        (14.24, 2, 8.85),
        (11.487, 2, 8.85),
        (11.487, 2, 6.1),
    ]]
    fillet(fillet_4_of_pattern_linear_1_edges, radius=FILLET_4_OF_PATTERN_LINEAR_1_R)

    # 草图13 → 凸台-拉伸5 (add)
    with BuildSketch(Plane(origin=(0, 0, -2.3), x_dir=(-1, 0, 0), z_dir=(0, 0, -1))):
        with BuildLine():
            Line((-25.256471053, -44.821473233), (-24.832206984, -44.397209164))
            ThreePointArc((-24.832206984, -44.397209164), (-27.90499919, -45.67000137), (-24.832206984, -46.942793576))
            Line((-24.832206984, -46.942793576), (-25.256471053, -46.518529507))
            ThreePointArc((-25.256471053, -46.518529507), (-27.30499919, -45.67000137), (-25.256471053, -44.821473233))
        make_face()
        with BuildLine():
            Line((-26.10499919, -45.37000137), (-24.60499919, -45.37000137))
            ThreePointArc((-24.60499919, -45.37000137), (-24.30499919, -45.67000137), (-24.60499919, -45.97000137))
            Line((-24.60499919, -45.97000137), (-26.10499919, -45.97000137))
            ThreePointArc((-26.10499919, -45.97000137), (-26.40499919, -45.67000137), (-26.10499919, -45.37000137))
        make_face()
    extrude(amount=EXTRUDE_5_DEPTH)

    # 圆角6
    fillet_6_edges = [part.edges().sort_by_distance(p)[0] for p in [
        (24.832206984, -46.942793576, -2.45),
        (25.256471053, -46.518529507, -2.45),
        (25.256471053, -44.821473233, -2.45),
        (24.832206984, -44.397209164, -2.45),
    ]]
    fillet(fillet_6_edges, radius=FILLET_6_R - 0.0001)  # a hair under: the kernel refuses the full size

    # 圆角5
    fillet_5_edges = [part.edges().sort_by_distance(p)[0] for p in [
        (26.40499919, -45.67000137, -2.6),
        (25.35499919, -45.97000137, -2.6),
        (24.30499919, -45.67000137, -2.6),
        (25.35499919, -45.37000137, -2.6),
        (27.90499919, -45.67000137, -2.6),
        (27.30499919, -45.67000137, -2.6),
        (24.979360848, -44.388492506, -2.6),
        (25.247753249, -44.717149471, -2.6),
        (25.247753249, -46.622853269, -2.6),
        (24.979360848, -46.951510234, -2.6),
    ]]
    fillet(fillet_5_edges, radius=FILLET_5_R)


solid = part.part
